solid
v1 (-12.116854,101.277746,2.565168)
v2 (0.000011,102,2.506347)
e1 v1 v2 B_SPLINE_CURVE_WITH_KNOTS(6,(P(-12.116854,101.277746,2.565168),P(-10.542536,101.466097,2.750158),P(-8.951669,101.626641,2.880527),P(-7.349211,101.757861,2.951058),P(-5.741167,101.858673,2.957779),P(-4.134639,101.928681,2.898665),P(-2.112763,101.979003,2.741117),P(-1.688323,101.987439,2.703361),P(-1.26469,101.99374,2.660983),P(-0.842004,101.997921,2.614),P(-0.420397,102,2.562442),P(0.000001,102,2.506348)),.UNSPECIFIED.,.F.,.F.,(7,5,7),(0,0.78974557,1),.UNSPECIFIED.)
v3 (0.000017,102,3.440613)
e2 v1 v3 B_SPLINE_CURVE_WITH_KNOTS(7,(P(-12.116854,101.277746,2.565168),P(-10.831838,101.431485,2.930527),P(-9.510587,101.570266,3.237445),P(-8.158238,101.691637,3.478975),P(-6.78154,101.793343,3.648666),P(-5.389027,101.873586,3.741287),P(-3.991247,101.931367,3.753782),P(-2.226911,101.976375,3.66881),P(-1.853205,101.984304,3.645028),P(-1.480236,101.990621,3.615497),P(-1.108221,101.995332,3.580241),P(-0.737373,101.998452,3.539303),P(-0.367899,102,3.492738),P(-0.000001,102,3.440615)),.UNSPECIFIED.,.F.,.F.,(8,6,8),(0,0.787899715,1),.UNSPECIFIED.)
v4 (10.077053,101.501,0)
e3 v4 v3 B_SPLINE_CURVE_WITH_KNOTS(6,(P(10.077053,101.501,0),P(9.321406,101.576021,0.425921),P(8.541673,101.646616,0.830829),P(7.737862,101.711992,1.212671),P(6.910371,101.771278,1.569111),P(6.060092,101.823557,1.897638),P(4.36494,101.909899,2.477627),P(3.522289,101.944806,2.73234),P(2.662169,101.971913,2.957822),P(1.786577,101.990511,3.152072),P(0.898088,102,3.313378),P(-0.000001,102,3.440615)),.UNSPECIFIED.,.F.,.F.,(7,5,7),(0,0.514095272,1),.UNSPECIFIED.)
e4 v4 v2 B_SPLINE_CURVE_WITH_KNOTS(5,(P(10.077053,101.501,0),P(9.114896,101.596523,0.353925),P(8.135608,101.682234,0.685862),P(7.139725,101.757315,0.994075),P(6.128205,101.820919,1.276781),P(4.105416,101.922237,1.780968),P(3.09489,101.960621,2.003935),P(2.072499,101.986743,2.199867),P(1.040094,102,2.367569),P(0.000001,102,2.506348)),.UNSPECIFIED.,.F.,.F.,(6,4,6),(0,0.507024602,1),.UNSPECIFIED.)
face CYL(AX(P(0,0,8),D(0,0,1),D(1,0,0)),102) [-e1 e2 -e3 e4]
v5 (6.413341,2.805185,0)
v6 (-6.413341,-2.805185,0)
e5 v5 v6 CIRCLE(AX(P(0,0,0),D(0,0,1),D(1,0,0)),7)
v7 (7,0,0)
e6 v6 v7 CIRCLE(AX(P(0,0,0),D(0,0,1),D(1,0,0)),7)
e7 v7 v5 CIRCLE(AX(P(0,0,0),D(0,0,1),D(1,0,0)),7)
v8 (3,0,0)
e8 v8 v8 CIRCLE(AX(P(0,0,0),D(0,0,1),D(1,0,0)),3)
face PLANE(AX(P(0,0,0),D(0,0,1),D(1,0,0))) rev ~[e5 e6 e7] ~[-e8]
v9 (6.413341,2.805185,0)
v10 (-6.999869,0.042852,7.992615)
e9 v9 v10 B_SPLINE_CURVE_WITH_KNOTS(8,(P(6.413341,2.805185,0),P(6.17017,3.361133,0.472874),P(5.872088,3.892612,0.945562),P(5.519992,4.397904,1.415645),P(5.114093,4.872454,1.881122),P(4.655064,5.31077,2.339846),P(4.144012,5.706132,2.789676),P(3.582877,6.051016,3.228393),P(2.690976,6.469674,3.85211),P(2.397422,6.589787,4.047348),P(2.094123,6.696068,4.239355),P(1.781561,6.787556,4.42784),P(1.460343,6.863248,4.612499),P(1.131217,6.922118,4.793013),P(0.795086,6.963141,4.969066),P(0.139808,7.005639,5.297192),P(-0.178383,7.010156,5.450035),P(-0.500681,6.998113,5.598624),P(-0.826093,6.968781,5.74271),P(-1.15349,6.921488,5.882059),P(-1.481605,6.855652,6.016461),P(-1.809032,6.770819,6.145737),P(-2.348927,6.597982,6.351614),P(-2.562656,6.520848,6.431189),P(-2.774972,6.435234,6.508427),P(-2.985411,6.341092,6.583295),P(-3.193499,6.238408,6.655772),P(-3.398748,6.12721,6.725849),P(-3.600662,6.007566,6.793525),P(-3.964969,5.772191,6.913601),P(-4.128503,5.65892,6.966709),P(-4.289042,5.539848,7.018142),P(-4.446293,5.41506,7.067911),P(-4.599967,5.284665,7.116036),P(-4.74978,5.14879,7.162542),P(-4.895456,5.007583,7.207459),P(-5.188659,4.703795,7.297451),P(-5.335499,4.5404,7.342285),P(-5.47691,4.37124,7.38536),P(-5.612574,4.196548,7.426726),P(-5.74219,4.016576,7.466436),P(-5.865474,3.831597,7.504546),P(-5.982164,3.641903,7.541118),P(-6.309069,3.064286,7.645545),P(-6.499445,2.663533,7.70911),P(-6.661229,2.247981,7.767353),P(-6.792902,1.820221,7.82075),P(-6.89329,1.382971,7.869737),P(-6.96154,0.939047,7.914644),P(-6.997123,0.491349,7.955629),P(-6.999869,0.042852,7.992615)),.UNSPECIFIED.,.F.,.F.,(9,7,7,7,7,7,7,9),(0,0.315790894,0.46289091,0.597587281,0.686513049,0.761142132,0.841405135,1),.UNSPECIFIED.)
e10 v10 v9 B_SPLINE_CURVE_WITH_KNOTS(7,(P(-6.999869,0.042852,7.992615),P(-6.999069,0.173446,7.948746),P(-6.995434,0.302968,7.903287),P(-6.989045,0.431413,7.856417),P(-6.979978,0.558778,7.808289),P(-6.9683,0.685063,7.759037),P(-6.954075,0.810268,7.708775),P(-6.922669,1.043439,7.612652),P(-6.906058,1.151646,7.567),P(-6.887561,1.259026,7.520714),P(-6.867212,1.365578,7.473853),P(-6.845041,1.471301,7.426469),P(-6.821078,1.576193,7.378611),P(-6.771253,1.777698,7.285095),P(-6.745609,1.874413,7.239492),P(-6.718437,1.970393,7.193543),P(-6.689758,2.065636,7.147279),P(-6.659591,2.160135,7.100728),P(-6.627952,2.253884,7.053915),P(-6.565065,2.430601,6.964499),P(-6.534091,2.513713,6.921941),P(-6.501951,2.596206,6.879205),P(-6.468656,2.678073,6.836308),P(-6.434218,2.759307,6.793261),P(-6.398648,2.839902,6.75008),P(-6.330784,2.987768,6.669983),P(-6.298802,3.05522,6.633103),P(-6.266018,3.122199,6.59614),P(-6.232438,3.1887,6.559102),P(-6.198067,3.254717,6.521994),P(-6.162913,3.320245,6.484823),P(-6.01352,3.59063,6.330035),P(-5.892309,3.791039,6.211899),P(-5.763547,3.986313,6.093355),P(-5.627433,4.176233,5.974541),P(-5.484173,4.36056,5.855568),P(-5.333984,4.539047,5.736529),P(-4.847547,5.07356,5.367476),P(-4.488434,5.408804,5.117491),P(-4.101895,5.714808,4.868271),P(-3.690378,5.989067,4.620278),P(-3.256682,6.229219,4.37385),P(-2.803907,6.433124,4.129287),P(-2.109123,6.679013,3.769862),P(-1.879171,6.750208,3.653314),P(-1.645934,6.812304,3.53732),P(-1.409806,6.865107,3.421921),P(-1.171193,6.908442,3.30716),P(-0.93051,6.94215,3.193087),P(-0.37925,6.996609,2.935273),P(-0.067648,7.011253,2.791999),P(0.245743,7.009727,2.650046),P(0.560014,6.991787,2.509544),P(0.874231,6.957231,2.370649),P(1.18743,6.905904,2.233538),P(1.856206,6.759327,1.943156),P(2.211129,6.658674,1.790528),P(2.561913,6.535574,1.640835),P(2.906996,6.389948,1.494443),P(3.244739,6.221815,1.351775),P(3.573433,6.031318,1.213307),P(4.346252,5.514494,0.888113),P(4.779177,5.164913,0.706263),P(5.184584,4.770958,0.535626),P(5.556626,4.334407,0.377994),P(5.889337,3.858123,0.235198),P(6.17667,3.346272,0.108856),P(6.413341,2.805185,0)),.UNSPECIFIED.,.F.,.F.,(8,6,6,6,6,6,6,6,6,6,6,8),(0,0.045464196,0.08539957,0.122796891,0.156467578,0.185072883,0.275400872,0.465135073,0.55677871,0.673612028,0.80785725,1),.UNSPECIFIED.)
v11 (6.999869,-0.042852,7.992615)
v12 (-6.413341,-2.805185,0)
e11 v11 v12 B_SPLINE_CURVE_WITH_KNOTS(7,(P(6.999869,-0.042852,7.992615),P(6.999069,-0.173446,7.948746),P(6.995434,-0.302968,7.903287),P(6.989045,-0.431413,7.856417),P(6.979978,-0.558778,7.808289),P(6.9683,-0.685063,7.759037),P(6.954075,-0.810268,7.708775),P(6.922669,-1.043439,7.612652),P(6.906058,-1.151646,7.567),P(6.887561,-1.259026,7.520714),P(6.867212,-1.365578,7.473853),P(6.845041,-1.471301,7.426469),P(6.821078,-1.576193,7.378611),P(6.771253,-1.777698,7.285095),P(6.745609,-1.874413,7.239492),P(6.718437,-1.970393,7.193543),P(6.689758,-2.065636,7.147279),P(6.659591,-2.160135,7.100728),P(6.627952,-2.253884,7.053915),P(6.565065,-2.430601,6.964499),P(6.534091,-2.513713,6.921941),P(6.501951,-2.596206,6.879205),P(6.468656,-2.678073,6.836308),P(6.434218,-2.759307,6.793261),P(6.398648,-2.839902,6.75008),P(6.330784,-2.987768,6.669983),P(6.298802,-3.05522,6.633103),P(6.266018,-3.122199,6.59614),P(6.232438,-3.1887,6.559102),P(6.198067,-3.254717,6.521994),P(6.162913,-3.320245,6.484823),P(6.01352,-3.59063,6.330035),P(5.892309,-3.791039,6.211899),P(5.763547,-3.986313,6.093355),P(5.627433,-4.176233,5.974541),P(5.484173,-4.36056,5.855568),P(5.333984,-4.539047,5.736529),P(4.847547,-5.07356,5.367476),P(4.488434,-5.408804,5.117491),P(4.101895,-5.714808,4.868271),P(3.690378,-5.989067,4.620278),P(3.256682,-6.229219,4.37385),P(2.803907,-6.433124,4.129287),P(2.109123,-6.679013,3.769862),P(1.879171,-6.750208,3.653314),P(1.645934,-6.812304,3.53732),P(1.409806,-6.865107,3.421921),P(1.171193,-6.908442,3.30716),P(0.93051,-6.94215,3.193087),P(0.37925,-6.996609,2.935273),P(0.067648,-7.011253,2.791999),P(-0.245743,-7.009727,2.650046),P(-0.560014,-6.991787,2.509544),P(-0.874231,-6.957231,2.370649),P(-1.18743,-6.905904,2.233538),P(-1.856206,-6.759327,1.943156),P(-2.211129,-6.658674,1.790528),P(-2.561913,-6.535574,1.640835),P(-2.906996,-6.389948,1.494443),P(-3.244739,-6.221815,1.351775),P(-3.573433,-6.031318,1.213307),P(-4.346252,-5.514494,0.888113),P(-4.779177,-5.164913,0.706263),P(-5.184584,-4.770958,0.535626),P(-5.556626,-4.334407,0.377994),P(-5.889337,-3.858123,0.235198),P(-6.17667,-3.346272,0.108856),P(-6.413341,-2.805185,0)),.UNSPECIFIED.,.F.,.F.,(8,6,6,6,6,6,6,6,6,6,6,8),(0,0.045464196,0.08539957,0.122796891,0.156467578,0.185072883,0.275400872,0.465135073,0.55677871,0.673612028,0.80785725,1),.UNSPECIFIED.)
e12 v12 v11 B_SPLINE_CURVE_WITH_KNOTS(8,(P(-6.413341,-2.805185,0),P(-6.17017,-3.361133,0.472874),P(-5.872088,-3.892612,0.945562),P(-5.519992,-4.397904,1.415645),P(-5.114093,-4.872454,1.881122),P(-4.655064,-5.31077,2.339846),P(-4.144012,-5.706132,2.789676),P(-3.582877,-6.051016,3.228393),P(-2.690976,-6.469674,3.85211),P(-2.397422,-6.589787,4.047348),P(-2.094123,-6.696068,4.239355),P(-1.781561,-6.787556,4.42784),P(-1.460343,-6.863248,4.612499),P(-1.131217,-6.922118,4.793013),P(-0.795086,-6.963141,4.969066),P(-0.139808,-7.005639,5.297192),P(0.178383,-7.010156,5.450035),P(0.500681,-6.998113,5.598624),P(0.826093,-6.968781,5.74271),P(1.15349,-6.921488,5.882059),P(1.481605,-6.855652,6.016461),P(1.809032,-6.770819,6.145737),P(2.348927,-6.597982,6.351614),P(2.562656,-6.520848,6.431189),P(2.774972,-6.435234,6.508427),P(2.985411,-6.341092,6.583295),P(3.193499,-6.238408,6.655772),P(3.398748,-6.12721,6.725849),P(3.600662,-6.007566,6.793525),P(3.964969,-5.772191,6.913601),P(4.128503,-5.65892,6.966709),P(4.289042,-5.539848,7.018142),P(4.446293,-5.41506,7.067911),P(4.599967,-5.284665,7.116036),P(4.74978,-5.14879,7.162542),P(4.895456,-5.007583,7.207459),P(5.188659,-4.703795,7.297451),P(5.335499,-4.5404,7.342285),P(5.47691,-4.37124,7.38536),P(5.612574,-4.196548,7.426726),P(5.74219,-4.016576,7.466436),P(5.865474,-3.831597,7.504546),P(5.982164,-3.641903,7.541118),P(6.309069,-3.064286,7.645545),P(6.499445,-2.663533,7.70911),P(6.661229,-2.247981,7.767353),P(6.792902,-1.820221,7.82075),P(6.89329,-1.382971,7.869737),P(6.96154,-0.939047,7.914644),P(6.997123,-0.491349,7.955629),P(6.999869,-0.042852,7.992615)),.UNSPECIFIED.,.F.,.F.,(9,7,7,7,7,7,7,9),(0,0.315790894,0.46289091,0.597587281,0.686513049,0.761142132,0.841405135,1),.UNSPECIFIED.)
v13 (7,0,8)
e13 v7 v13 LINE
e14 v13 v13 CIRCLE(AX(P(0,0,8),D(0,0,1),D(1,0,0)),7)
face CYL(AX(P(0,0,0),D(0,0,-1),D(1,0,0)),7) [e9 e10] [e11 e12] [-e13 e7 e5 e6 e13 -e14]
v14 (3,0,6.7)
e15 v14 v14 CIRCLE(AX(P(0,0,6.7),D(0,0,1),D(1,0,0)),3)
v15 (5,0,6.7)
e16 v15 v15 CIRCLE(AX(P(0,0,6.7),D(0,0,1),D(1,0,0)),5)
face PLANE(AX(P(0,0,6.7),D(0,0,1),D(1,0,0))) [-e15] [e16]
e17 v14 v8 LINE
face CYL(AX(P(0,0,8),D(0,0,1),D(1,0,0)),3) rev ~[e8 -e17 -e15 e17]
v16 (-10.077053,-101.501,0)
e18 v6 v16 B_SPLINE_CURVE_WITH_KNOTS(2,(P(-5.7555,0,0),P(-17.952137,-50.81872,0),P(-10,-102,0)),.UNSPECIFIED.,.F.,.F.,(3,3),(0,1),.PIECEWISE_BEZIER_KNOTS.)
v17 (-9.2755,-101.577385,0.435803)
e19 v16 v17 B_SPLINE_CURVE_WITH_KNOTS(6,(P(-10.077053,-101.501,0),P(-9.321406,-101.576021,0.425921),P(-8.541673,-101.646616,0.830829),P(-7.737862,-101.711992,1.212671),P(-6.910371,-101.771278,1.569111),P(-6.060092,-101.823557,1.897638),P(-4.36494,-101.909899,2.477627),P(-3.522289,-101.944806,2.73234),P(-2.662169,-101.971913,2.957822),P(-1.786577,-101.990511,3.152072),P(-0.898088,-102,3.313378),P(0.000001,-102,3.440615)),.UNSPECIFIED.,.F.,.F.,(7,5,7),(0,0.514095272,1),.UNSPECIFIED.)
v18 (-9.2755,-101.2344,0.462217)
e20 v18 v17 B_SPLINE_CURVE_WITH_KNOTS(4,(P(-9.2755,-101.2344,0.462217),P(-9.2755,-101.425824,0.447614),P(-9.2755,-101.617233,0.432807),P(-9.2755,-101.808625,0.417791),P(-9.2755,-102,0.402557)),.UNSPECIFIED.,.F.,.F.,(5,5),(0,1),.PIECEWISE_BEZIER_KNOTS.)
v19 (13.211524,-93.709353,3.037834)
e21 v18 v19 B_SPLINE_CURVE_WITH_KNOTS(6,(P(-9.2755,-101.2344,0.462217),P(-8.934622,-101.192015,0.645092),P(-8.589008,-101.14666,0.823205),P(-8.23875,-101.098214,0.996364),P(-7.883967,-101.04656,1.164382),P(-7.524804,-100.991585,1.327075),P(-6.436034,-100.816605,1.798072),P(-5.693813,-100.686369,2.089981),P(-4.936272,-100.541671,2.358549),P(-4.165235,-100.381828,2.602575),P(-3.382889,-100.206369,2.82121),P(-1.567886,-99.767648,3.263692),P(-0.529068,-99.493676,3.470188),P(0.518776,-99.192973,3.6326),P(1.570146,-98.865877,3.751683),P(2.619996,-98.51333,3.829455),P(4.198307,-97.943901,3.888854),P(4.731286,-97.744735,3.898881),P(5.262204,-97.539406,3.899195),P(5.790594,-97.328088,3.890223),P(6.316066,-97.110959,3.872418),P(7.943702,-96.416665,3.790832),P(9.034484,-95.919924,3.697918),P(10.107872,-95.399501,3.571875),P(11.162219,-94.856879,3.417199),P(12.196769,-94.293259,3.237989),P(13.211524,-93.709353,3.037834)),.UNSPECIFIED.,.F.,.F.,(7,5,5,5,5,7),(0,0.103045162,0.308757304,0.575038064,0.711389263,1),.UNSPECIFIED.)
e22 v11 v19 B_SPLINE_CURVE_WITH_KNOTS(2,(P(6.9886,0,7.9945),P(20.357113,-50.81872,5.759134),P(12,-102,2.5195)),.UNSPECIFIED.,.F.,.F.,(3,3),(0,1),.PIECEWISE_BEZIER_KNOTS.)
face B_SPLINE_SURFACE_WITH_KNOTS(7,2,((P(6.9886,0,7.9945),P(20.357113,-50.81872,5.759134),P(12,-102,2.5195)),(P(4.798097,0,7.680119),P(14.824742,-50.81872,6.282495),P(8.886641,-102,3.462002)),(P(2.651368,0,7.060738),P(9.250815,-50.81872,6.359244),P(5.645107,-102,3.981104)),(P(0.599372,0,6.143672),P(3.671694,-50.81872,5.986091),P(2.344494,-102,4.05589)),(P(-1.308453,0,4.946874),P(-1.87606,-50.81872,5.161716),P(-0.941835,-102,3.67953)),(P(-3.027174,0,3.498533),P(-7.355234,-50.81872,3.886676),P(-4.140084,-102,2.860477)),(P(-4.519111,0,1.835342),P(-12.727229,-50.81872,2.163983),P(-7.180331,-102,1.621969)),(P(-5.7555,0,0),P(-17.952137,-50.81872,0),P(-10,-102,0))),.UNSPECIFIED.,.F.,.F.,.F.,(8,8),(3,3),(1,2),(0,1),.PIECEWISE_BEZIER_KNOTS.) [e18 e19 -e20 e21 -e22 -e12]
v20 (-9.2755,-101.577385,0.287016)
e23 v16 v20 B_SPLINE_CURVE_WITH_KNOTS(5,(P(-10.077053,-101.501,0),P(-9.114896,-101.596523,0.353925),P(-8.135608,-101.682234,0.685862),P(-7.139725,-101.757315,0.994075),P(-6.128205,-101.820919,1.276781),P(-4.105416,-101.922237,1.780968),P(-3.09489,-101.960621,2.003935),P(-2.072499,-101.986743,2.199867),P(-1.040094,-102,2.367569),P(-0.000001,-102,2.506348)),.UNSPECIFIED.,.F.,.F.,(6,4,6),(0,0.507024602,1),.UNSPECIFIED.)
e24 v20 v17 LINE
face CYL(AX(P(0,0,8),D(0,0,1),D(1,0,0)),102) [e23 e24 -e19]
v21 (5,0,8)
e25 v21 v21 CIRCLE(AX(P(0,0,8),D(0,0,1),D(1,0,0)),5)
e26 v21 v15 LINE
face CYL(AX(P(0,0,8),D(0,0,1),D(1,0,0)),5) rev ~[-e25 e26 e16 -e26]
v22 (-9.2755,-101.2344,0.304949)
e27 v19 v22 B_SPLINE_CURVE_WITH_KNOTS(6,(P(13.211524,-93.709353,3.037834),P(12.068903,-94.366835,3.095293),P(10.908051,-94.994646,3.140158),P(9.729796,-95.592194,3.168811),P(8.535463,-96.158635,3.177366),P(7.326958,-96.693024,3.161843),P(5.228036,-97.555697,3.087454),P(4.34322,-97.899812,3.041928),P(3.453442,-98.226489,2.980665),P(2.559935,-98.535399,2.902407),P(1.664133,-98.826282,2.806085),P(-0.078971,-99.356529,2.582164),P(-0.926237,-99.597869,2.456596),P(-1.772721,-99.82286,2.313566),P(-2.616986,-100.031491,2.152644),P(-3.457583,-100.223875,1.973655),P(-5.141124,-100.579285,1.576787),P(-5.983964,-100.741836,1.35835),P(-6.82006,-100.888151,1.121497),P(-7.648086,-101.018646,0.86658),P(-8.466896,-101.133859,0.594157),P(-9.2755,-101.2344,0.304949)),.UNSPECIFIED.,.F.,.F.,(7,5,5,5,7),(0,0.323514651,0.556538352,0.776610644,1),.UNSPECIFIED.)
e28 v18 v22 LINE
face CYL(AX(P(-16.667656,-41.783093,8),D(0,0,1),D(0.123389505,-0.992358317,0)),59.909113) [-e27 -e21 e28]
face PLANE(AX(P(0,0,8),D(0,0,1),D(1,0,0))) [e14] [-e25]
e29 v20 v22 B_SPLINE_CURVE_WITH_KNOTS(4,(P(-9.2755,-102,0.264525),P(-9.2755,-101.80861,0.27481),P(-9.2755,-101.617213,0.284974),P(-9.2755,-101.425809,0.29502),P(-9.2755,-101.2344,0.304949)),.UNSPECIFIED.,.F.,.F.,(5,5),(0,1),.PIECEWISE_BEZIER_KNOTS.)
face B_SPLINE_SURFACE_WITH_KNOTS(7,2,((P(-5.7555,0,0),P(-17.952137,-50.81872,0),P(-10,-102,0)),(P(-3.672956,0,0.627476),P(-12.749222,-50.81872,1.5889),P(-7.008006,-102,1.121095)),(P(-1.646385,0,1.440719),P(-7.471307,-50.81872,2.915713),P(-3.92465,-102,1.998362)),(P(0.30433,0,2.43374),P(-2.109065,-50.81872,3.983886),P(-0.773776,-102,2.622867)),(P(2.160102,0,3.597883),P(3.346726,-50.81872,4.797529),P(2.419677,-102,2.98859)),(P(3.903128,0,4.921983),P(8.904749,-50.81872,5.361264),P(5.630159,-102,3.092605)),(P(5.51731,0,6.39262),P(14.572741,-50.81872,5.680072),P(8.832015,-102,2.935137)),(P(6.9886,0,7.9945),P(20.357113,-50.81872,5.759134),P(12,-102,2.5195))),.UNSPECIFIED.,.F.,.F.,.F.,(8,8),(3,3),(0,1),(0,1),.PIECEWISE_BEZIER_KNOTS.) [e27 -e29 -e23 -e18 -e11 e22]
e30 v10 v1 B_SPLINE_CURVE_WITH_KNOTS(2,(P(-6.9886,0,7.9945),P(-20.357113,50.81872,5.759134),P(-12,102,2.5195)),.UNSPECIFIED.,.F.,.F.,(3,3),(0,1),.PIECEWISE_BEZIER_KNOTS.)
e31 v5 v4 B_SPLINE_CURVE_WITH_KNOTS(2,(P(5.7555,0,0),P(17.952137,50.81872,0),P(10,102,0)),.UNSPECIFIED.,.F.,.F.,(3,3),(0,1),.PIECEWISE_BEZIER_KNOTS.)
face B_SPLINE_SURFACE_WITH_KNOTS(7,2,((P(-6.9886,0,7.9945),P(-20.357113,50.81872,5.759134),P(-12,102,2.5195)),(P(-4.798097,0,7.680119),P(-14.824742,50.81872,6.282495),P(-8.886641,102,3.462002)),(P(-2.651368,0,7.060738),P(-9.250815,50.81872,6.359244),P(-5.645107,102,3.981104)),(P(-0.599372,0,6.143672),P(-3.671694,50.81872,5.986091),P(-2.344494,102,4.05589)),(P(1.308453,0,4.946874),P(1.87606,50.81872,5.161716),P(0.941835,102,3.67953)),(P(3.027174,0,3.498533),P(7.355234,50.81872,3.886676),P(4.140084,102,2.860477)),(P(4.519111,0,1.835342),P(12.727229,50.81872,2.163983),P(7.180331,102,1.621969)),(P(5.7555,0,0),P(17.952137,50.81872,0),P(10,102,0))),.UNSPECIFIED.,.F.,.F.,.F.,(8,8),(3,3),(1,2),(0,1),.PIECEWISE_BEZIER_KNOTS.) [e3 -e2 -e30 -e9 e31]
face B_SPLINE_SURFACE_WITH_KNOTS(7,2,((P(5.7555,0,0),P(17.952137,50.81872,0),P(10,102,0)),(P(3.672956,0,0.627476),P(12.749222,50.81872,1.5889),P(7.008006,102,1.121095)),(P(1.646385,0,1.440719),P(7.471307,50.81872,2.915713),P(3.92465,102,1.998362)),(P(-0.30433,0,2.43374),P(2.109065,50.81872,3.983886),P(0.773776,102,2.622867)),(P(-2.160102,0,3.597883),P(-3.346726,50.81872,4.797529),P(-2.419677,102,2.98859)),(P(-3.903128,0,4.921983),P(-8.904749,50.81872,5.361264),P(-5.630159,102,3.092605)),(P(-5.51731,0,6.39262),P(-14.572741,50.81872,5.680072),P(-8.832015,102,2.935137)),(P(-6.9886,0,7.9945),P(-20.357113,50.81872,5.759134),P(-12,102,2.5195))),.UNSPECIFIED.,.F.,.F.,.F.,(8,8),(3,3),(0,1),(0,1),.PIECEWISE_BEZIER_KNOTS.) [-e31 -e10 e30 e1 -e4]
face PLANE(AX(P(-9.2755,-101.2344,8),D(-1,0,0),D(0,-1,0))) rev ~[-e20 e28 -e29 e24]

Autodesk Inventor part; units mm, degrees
ref_plane "YZ Plane" through (0, 0, 0) normal (1, 0, 0) x (0, 1, 0)
sketch "Sketch1" plane through (0, 0, 0) normal (0, 0, 1) x (1, 0, 0)
  circle A0 centre (0, 0) radius 7
  dimension "d0" = 14
extrude "Extrusion1" add sketch "Sketch1" along normal blind 8
sketch "Sketch2" plane through (0, 0, 8) normal (0, 0, 1) x (1, 0, 0)
  circle A0 centre (0, 0) radius 7 projected
  circle A1 centre (0, 0) radius 3
  dimension "d3" = 6
sketch "Sketch5" plane through (0, 0, 0) normal (0, 1, 0) x (-1, 0, 0)
  arc A0 (6.9886, 7.9945) -> (-5.7555, 0) centre (9.6228, -10.3597) ccw
  arc A1 (-5.7555, 0) -> (6.9886, 7.9945) centre (-13.9623, 27.2376) ccw
  point P0 (0, 0)
ref_plane "Work Plane1" through (0, 102, 0) normal (0, 1, 0) x (-1, 0, 0)
sketch "Sketch7" plane through (0, 102, 0) normal (0, 1, 0) x (-1, 0, 0)
  arc A0 (12, 2.5195) -> (-10, 0) centre (3.9145, -24.1892) ccw
  arc A1 (12, 2.5195) -> (-10, 0) centre (6.0497, -42.8334) ccw
  point P0 (0, 0)
  dimension "d32" = 12
  dimension "d33" = 10
  dimension "d34" = 0
ref_plane "Work Plane2" through (0, 50, 0) normal (0, 1, 0) x (-1, 0, 0)
sketch "Sketch8" plane through (0, 50, 0) normal (0, 1, 0) x (-1, 0, 0)
  arc A0 (14.8793, 5.5568) -> (-12.8755, 0) centre (10.0783, -42.5555) ccw
  arc A1 (14.8793, 5.5568) -> (-12.8755, 0) centre (26.1398, -122.7786) ccw
  point P0 (0, 0)
loft "Loft1" add profiles "Sketch5", "Sketch8", "Sketch7"
pattern_circular "Circular Pattern1" count 2 over 360 about axis through (0, 0, -10) along (0, 0, 1) of "Loft1"
sketch "Sketch10" plane through (0, 0, 8) normal (0, 0, 1) x (1, 0, 0)
  circle A0 centre (0, 0) radius 7 projected
  circle A1 centre (0, 0) radius 102
  circle A2 centre (0, 0) radius 119.0756
  dimension "d25" = 204
extrude "Extrusion4" cut sketch "Sketch10" against normal through all contours A2
sketch "Sketch11" plane through (0, 0, 8) normal (0, 0, 1) x (1, 0, 0)
  arc A0 (-9.2755, -101.2344) -> (21.1659, -88.2344) centre (-16.6676, -41.7833) ccw
  line L0 (21.1659, -88.2344) -> (21.1659, -103.2344)
  line L1 (21.1659, -103.2344) -> (-9.2755, -103.2344)
  line L2 (-9.2755, -101.2344) -> (-9.2755, -103.2344)
  dimension "d28" = 15
  dimension "d29" = 2
extrude "Extrusion5" cut sketch "Sketch11" against normal through all
sketch "Sketch3" plane through (0, 0, 8) normal (0, 0, 1) x (1, 0, 0)
  circle A0 centre (0, 0) radius 3 projected
  circle A1 centre (0, 0) radius 7 projected
  circle A2 centre (0, 0) radius 5
  dimension "d6" = 10
extrude "Extrusion6" cut sketch "Sketch3" against normal through all contours A0
sketch "Sketch12" plane through (0, 0, 8) normal (0, 0, 1) x (1, 0, 0)
  circle A0 centre (0, 0) radius 3 projected
  circle A1 centre (0, 0) radius 7 projected
  circle A2 centre (0, 0) radius 5
  dimension "d37" = 10
extrude "Extrusion7" cut sketch "Sketch12" against normal blind 1.3 contours A2
properties part number "prop"
